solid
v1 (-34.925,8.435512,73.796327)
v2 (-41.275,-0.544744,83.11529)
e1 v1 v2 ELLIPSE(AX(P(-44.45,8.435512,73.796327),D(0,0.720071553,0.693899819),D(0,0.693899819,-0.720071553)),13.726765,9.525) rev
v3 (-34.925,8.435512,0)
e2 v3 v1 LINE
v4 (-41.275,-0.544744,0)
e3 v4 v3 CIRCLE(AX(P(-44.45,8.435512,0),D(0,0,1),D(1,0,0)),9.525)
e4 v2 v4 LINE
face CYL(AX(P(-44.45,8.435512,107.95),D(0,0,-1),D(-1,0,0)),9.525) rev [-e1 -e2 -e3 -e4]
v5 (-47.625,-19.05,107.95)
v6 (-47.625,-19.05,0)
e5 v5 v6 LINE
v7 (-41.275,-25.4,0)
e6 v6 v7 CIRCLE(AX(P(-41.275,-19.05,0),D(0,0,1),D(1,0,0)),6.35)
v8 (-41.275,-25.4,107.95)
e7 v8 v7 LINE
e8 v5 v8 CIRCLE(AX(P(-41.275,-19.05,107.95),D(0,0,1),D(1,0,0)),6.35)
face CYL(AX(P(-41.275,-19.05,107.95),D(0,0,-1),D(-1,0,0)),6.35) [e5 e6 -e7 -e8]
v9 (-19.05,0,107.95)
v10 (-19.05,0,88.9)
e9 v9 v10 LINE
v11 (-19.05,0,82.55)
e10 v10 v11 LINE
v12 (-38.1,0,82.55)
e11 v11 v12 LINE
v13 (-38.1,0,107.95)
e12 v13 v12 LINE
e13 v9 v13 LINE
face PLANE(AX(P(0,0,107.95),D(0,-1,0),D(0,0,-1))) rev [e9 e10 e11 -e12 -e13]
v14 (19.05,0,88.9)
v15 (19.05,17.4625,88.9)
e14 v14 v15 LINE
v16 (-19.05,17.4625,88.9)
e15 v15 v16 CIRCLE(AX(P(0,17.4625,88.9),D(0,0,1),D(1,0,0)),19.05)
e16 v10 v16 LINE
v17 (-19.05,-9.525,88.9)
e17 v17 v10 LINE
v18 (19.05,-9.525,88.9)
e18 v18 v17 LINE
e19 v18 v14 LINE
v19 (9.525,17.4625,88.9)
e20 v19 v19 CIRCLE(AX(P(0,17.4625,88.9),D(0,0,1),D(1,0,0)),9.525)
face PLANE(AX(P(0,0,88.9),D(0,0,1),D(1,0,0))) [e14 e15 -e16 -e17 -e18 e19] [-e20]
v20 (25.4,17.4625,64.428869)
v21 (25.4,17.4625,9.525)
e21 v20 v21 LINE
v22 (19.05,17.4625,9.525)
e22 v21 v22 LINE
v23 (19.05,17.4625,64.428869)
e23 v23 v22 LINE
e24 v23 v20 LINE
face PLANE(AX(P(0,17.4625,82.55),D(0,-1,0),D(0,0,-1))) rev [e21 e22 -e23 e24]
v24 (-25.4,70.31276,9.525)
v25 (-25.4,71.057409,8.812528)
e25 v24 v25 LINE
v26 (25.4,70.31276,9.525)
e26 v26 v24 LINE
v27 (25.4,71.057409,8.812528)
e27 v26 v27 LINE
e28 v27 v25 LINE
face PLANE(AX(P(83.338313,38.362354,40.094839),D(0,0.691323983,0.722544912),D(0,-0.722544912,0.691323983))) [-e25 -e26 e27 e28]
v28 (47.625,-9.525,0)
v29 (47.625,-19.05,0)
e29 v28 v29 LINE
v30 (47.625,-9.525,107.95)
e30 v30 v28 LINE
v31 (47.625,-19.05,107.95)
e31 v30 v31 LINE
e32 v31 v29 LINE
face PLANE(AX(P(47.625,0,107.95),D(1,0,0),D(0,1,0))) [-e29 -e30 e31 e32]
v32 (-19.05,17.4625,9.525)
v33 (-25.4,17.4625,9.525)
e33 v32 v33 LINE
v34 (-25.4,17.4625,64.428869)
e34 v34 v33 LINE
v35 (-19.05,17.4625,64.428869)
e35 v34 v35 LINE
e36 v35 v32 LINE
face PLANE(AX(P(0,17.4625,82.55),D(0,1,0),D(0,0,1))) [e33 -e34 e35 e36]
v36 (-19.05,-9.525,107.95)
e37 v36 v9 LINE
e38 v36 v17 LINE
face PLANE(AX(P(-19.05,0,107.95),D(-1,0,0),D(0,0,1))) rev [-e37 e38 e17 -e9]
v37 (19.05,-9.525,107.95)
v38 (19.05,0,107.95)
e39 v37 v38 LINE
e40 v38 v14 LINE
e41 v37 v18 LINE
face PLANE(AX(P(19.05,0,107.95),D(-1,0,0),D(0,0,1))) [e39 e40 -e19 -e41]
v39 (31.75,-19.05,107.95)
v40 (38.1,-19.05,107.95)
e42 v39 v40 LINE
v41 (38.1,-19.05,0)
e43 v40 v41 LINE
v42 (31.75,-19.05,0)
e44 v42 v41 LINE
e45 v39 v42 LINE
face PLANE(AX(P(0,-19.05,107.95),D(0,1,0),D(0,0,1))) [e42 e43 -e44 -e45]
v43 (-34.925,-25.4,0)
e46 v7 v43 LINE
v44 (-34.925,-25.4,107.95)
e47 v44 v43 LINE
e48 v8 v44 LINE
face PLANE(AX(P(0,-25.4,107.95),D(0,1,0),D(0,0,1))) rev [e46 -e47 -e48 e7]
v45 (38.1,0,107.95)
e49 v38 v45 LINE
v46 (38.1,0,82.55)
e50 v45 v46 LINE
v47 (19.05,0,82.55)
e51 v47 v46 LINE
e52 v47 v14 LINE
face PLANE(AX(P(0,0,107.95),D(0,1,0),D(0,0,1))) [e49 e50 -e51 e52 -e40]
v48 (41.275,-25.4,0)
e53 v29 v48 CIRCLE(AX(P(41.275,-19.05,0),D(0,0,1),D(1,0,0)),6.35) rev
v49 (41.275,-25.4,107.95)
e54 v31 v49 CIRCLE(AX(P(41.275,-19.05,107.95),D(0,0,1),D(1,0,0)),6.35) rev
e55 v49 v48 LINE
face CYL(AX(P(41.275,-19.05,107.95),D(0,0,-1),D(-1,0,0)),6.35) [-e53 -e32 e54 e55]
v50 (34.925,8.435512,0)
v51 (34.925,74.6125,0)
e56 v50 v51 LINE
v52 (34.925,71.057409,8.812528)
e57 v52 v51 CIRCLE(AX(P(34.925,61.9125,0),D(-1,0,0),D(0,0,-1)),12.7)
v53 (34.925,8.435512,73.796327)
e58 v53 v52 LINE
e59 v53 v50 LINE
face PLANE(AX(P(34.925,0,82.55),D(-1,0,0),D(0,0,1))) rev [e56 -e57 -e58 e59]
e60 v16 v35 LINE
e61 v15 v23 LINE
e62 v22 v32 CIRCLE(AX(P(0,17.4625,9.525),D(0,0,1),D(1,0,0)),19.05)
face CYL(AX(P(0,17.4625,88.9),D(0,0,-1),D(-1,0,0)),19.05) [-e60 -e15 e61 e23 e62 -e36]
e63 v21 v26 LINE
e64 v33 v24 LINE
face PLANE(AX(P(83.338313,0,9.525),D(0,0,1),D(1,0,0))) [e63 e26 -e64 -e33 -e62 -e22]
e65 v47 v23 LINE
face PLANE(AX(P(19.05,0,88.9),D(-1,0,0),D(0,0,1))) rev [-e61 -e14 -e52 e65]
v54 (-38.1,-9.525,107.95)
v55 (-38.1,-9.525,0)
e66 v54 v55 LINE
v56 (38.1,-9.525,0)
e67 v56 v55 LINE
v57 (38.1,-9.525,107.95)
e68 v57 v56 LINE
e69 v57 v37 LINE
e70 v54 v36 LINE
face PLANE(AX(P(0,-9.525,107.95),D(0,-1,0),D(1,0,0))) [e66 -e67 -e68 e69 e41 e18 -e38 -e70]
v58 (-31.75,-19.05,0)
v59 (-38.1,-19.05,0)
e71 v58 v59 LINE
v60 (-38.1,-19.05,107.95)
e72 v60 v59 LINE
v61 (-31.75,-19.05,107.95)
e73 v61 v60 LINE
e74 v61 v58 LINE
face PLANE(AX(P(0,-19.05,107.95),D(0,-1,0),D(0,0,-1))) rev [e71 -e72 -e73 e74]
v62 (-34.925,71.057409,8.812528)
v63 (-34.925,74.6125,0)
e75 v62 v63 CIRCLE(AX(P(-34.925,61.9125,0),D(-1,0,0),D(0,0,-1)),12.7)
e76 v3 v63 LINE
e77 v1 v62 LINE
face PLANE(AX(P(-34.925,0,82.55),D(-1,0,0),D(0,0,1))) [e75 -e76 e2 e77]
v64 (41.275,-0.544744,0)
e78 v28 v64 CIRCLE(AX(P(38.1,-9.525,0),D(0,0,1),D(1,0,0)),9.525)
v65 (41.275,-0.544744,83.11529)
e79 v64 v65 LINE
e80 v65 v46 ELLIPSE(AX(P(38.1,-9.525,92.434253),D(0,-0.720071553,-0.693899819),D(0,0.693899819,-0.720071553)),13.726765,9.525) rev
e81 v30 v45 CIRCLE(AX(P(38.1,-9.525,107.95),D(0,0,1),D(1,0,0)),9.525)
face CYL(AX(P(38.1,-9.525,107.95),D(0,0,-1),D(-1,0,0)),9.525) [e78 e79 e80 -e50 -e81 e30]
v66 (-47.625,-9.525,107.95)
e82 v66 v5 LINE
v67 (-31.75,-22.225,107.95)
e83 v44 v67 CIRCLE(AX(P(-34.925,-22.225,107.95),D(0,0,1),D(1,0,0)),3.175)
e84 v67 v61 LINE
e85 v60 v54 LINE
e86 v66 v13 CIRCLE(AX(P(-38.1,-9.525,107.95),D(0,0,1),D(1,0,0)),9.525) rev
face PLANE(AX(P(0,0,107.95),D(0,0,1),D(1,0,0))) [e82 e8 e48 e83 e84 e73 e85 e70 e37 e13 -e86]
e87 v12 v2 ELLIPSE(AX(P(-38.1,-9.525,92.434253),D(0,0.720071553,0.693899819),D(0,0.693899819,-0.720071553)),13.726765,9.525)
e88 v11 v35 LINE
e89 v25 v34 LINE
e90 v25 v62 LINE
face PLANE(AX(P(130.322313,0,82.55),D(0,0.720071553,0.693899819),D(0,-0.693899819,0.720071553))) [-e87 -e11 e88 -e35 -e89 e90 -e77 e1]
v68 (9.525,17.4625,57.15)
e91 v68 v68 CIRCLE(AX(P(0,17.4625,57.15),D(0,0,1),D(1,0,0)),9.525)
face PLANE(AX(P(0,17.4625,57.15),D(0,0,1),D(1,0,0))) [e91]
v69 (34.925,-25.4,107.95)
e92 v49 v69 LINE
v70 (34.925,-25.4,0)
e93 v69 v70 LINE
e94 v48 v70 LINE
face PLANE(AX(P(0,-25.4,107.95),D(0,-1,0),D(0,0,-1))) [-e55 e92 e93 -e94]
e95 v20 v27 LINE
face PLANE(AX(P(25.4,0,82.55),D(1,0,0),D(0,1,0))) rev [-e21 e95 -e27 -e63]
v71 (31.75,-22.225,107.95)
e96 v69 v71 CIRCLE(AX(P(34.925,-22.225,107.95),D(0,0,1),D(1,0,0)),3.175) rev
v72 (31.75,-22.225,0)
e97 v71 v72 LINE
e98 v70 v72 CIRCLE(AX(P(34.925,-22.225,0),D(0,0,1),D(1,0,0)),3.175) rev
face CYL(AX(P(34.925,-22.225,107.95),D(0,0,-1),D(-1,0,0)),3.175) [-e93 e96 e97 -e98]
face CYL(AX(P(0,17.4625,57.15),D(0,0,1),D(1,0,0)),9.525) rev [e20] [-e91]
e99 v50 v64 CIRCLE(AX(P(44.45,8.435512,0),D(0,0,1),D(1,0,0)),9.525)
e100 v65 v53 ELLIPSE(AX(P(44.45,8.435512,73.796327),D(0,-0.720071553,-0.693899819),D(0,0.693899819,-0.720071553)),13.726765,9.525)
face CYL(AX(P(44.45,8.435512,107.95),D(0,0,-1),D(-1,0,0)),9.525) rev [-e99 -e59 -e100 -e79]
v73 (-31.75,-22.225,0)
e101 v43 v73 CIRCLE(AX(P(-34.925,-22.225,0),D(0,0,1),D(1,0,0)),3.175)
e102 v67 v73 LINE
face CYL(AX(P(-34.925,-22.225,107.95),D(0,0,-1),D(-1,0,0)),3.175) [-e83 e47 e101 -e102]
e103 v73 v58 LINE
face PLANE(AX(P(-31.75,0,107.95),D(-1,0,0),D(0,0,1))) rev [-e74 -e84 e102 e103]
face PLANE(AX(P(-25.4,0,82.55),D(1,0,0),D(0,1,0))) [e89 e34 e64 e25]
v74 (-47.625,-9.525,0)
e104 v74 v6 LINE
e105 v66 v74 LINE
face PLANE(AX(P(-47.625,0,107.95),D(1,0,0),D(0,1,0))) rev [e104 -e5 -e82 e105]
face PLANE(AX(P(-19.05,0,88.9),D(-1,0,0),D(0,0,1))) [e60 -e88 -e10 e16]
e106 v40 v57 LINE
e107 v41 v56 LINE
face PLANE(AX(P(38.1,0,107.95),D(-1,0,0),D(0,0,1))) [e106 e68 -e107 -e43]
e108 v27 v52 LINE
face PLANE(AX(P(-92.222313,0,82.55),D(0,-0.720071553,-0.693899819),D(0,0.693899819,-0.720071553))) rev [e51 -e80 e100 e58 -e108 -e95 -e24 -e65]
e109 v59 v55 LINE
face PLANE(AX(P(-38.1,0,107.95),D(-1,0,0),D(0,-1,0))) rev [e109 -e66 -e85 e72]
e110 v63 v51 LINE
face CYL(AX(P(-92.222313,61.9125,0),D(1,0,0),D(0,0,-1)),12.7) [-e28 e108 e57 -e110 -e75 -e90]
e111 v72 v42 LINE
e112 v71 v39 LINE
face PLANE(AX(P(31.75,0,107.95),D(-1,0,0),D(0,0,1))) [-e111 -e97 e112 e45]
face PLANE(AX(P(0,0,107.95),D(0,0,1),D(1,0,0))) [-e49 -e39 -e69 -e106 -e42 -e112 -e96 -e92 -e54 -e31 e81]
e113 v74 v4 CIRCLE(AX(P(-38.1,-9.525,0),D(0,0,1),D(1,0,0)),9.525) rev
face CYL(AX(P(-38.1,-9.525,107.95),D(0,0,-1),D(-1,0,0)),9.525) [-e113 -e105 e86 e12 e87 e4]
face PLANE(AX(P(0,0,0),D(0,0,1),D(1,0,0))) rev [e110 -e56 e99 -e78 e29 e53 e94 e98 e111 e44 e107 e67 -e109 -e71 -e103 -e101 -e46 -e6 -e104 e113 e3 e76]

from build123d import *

# Parameters (mm, degrees)
BOSS_EXTRUDE1_DEPTH   = 107.95
BOSS_EXTRUDE1_2_DEPTH = 107.95
SKETCH1_6_W           = 6.35
SKETCH1_6_H           = 17.4625
BOSS_EXTRUDE2_DEPTH   = 82.55
CUT_EXTRUDE2_REACH    = 157.031
BOSS_EXTRUDE4_DEPTH   = 88.9
BOSS_EXTRUDE6_REACH   = 152.176
SKETCH5_R             = 9.525
CUT_EXTRUDE3_DEPTH    = 31.75
FILLET2_R             = 9.525


with BuildPart() as part:
    # Sketch1 → Boss-Extrude1 (new body)
    with BuildSketch(Plane.XY):
        with BuildLine():
            ThreePointArc((34.925, -25.4), (32.67993597, -24.47006403), (31.75, -22.225))
            Line((31.75, -22.225), (31.75, -19.05))
            Line((31.75, -19.05), (38.1, -19.05))
            Line((38.1, -19.05), (38.1, -9.525))
            Line((38.1, -9.525), (19.05, -9.525))
            Line((19.05, -9.525), (19.05, 0))
            Line((19.05, 0), (38.1, 0))
            ThreePointArc((38.1, 0), (44.835192091, -2.789807909), (47.625, -9.525))
            Line((47.625, -9.525), (47.625, -19.05))
            ThreePointArc((47.625, -19.05), (45.765128061, -23.540128061), (41.275, -25.4))
            Line((41.275, -25.4), (34.925, -25.4))
        make_face()
    extrude(amount=BOSS_EXTRUDE1_DEPTH)

    # Sketch1<6> → Boss-Extrude2 (add)
    with BuildSketch(Plane.XY):
        with Locations((22.225, 8.73125)):
            Rectangle(SKETCH1_6_W, SKETCH1_6_H)
        Polygon((25.4, 17.4625), (25.4, 0), (34.925, 0), (34.925, 74.6125), (25.4, 74.6125), align=None)
    boss_extrude2 = extrude(amount=BOSS_EXTRUDE2_DEPTH)

    # Cut-Extrude2: up to this face of the body (flat: up to its plane)
    cut_extrude2_end = Plane(part.part.faces().sort_by_distance((19.05, 3.113443878, 46.562346939))[0])
    # Sketch3 → Cut-Extrude2 (cut, up to the picked face)
    with BuildSketch(Plane(origin=(34.925, 0, 0), x_dir=(0, 0, -1), z_dir=(1, 0, 0)), mode=Mode.PRIVATE) as cut_extrude2_sk1:
        with BuildLine():
            Line((-82.55, 0), (-8.812527697, 71.057408725))
            ThreePointArc((-8.812527697, 71.057408725), (-4.751297675, 73.690240462), (0, 74.6125))
            Line((0, 74.6125), (-82.55, 74.6125))
            Line((-82.55, 74.6125), (-82.55, 0))
        make_face()
    cut_extrude2_tool1 = split(extrude(cut_extrude2_sk1.sketch, amount=-CUT_EXTRUDE2_REACH, mode=Mode.PRIVATE), bisect_by=cut_extrude2_end, keep=Keep.BOTH, mode=Mode.PRIVATE)
    cut_extrude2 = cut_extrude2_tool1.solids().sort_by(Axis((34.925, 49.768554, 56.6833), (-1, 0, 0)))[0]
    add(cut_extrude2, mode=Mode.SUBTRACT)



with BuildPart() as body_2:
    # Sketch1 → Boss-Extrude1 2 (new body)
    with BuildSketch(Plane.XY):
        with BuildLine():
            Line((-38.1, -9.525), (-19.05, -9.525))
            Line((-19.05, -9.525), (-19.05, 0))
            Line((-19.05, 0), (-25.4, 0))
            Line((-25.4, 0), (-34.925, 0))
            Line((-34.925, 0), (-38.1, 0))
            ThreePointArc((-38.1, 0), (-44.835192091, -2.789807909), (-47.625, -9.525))
            Line((-47.625, -9.525), (-47.625, -19.05))
            ThreePointArc((-47.625, -19.05), (-45.765128061, -23.540128061), (-41.275, -25.4))
            Line((-41.275, -25.4), (-34.925, -25.4))
            ThreePointArc((-34.925, -25.4), (-32.67993597, -24.47006403), (-31.75, -22.225))
            Line((-31.75, -22.225), (-31.75, -19.05))
            Line((-31.75, -19.05), (-38.1, -19.05))
            Line((-38.1, -19.05), (-38.1, -9.525))
        make_face()
    extrude(amount=BOSS_EXTRUDE1_2_DEPTH)


with BuildPart() as part_1:
    add(part.part)

    add(body_2.part)  # Boss-Extrude4 merges body 2
    # Sketch1<8> → Boss-Extrude4 (add)
    with BuildSketch(Plane.XY):
        with BuildLine():
            Line((19.05, -9.525), (19.05, 0))
            Line((19.05, 0), (19.05, 17.4625))
            ThreePointArc((19.05, 17.4625), (0, 36.5125), (-19.05, 17.4625))
            Line((-19.05, 17.4625), (-19.05, 0))
            Line((-19.05, 0), (-19.05, -9.525))
            Line((-19.05, -9.525), (19.05, -9.525))
        make_face()
    extrude(amount=BOSS_EXTRUDE4_DEPTH)

    # Mirror1: Boss-Extrude2, Cut-Extrude2 across plane
    add(boss_extrude2.mirror(Plane(origin=(0, 0, 0), x_dir=(0, 0, 1), z_dir=(1, 0, 0))))
    add(cut_extrude2.mirror(Plane(origin=(0, 0, 0), x_dir=(0, 0, 1), z_dir=(1, 0, 0))), mode=Mode.SUBTRACT)

    # Boss-Extrude6: up to this face of the body (flat: up to its plane)
    boss_extrude6_end = Plane(part_1.part.faces().sort_by_distance((25.4, 37.857380573, 21.629312561))[0])
    # Sketch4 → Boss-Extrude6 (add, up to the picked face)
    with BuildSketch(Plane(origin=(-25.4, 0, 0), x_dir=(0, 0, -1), z_dir=(1, 0, 0)), mode=Mode.PRIVATE) as boss_extrude6_sk1:
        with BuildLine():
            Line((0, 17.4625), (0, 74.6125))
            ThreePointArc((0, 74.6125), (-4.751297675, 73.690240462), (-8.812527697, 71.057408725))
            Line((-8.812527697, 71.057408725), (-9.525, 70.312760413))
            Line((-9.525, 70.312760413), (-9.525, 17.4625))
            Line((-9.525, 17.4625), (0, 17.4625))
        make_face()
    boss_extrude6_tool1 = split(extrude(boss_extrude6_sk1.sketch, amount=BOSS_EXTRUDE6_REACH, mode=Mode.PRIVATE), bisect_by=boss_extrude6_end, keep=Keep.BOTH, mode=Mode.PRIVATE)
    add(boss_extrude6_tool1.solids().sort_by(Axis((-25.4, 45.391099, 4.704073), (1, 0, 0)))[0])

    # Sketch5 → Cut-Extrude3 (cut)
    with BuildSketch(Plane.XY.offset(88.9)):
        with Locations((0, 17.4625)):
            Circle(SKETCH5_R)
    extrude(amount=-CUT_EXTRUDE3_DEPTH, mode=Mode.SUBTRACT)

    # Fillet2
    # the kernel refuses this fillet: 9.525 mm, written as the material it adds along each edge
    with BuildSketch(Plane(origin=(-34.925, 0, 0), x_dir=(-0.9963405296085165, -0.08547250469841781, 0), z_dir=(0, 0, 1))) as fillet2_piece_1_section:
        with BuildLine():
            CenterArc((8.769139185, -9.218768342), FILLET2_R, 104.568024357, 70.528779366)
            Line((-0.72100436, -8.404642735), (-1.670018714, -8.323230174))
            Line((-1.670018714, -8.323230174), (-0.949014354, 0.081412561))
            Line((-0.949014354, 0.081412561), (0.081412561, 0.949014354))
            ThreePointArc((0.081412561, 0.949014354), (3.244793742, 0.677639152), (6.133741367, 0.921876834))
            Line((6.133741367, 0.921876834), (6.373322987, 0))
        make_face()
    fillet2_piece_1 = extrude(amount=103.638780605, mode=Mode.PRIVATE)
    fillet2_piece_1 = split(fillet2_piece_1, bisect_by=Plane(origin=(-36.202557182, 22.072398362, 59.645099694), z_dir=(0, -0.7200715531259144, -0.6938998186905898)), keep=Keep.TOP, mode=Mode.PRIVATE)
    add(fillet2_piece_1)
    with BuildSketch(Plane(origin=(34.925, 0, 0), x_dir=(0, 1, 0), z_dir=(0, 0, 1))) as fillet2_piece_2_section:
        with BuildLine():
            CenterArc((8.435512242, -9.525), FILLET2_R, 90, 70.528779366)
            Line((-0.544743879, -6.35), (-1.442769491, -6.0325))
            ThreePointArc((-1.442769491, -6.0325), (-0.9525, -3.175), (-0.9525, 0))
            Line((-0.9525, 0), (0, 0.9525))
            Line((0, 0.9525), (8.435512242, 0.9525))
            Line((8.435512242, 0.9525), (8.435512242, 0))
        make_face()
    fillet2_piece_2 = extrude(amount=103.638780605, mode=Mode.PRIVATE)
    fillet2_piece_2 = split(fillet2_piece_2, bisect_by=Plane(origin=(36.202557182, 22.072398362, 59.645099694), z_dir=(0, -0.7200715531259144, -0.6938998186905898)), keep=Keep.TOP, mode=Mode.PRIVATE)
    add(fillet2_piece_2)


solid = part_1.part
